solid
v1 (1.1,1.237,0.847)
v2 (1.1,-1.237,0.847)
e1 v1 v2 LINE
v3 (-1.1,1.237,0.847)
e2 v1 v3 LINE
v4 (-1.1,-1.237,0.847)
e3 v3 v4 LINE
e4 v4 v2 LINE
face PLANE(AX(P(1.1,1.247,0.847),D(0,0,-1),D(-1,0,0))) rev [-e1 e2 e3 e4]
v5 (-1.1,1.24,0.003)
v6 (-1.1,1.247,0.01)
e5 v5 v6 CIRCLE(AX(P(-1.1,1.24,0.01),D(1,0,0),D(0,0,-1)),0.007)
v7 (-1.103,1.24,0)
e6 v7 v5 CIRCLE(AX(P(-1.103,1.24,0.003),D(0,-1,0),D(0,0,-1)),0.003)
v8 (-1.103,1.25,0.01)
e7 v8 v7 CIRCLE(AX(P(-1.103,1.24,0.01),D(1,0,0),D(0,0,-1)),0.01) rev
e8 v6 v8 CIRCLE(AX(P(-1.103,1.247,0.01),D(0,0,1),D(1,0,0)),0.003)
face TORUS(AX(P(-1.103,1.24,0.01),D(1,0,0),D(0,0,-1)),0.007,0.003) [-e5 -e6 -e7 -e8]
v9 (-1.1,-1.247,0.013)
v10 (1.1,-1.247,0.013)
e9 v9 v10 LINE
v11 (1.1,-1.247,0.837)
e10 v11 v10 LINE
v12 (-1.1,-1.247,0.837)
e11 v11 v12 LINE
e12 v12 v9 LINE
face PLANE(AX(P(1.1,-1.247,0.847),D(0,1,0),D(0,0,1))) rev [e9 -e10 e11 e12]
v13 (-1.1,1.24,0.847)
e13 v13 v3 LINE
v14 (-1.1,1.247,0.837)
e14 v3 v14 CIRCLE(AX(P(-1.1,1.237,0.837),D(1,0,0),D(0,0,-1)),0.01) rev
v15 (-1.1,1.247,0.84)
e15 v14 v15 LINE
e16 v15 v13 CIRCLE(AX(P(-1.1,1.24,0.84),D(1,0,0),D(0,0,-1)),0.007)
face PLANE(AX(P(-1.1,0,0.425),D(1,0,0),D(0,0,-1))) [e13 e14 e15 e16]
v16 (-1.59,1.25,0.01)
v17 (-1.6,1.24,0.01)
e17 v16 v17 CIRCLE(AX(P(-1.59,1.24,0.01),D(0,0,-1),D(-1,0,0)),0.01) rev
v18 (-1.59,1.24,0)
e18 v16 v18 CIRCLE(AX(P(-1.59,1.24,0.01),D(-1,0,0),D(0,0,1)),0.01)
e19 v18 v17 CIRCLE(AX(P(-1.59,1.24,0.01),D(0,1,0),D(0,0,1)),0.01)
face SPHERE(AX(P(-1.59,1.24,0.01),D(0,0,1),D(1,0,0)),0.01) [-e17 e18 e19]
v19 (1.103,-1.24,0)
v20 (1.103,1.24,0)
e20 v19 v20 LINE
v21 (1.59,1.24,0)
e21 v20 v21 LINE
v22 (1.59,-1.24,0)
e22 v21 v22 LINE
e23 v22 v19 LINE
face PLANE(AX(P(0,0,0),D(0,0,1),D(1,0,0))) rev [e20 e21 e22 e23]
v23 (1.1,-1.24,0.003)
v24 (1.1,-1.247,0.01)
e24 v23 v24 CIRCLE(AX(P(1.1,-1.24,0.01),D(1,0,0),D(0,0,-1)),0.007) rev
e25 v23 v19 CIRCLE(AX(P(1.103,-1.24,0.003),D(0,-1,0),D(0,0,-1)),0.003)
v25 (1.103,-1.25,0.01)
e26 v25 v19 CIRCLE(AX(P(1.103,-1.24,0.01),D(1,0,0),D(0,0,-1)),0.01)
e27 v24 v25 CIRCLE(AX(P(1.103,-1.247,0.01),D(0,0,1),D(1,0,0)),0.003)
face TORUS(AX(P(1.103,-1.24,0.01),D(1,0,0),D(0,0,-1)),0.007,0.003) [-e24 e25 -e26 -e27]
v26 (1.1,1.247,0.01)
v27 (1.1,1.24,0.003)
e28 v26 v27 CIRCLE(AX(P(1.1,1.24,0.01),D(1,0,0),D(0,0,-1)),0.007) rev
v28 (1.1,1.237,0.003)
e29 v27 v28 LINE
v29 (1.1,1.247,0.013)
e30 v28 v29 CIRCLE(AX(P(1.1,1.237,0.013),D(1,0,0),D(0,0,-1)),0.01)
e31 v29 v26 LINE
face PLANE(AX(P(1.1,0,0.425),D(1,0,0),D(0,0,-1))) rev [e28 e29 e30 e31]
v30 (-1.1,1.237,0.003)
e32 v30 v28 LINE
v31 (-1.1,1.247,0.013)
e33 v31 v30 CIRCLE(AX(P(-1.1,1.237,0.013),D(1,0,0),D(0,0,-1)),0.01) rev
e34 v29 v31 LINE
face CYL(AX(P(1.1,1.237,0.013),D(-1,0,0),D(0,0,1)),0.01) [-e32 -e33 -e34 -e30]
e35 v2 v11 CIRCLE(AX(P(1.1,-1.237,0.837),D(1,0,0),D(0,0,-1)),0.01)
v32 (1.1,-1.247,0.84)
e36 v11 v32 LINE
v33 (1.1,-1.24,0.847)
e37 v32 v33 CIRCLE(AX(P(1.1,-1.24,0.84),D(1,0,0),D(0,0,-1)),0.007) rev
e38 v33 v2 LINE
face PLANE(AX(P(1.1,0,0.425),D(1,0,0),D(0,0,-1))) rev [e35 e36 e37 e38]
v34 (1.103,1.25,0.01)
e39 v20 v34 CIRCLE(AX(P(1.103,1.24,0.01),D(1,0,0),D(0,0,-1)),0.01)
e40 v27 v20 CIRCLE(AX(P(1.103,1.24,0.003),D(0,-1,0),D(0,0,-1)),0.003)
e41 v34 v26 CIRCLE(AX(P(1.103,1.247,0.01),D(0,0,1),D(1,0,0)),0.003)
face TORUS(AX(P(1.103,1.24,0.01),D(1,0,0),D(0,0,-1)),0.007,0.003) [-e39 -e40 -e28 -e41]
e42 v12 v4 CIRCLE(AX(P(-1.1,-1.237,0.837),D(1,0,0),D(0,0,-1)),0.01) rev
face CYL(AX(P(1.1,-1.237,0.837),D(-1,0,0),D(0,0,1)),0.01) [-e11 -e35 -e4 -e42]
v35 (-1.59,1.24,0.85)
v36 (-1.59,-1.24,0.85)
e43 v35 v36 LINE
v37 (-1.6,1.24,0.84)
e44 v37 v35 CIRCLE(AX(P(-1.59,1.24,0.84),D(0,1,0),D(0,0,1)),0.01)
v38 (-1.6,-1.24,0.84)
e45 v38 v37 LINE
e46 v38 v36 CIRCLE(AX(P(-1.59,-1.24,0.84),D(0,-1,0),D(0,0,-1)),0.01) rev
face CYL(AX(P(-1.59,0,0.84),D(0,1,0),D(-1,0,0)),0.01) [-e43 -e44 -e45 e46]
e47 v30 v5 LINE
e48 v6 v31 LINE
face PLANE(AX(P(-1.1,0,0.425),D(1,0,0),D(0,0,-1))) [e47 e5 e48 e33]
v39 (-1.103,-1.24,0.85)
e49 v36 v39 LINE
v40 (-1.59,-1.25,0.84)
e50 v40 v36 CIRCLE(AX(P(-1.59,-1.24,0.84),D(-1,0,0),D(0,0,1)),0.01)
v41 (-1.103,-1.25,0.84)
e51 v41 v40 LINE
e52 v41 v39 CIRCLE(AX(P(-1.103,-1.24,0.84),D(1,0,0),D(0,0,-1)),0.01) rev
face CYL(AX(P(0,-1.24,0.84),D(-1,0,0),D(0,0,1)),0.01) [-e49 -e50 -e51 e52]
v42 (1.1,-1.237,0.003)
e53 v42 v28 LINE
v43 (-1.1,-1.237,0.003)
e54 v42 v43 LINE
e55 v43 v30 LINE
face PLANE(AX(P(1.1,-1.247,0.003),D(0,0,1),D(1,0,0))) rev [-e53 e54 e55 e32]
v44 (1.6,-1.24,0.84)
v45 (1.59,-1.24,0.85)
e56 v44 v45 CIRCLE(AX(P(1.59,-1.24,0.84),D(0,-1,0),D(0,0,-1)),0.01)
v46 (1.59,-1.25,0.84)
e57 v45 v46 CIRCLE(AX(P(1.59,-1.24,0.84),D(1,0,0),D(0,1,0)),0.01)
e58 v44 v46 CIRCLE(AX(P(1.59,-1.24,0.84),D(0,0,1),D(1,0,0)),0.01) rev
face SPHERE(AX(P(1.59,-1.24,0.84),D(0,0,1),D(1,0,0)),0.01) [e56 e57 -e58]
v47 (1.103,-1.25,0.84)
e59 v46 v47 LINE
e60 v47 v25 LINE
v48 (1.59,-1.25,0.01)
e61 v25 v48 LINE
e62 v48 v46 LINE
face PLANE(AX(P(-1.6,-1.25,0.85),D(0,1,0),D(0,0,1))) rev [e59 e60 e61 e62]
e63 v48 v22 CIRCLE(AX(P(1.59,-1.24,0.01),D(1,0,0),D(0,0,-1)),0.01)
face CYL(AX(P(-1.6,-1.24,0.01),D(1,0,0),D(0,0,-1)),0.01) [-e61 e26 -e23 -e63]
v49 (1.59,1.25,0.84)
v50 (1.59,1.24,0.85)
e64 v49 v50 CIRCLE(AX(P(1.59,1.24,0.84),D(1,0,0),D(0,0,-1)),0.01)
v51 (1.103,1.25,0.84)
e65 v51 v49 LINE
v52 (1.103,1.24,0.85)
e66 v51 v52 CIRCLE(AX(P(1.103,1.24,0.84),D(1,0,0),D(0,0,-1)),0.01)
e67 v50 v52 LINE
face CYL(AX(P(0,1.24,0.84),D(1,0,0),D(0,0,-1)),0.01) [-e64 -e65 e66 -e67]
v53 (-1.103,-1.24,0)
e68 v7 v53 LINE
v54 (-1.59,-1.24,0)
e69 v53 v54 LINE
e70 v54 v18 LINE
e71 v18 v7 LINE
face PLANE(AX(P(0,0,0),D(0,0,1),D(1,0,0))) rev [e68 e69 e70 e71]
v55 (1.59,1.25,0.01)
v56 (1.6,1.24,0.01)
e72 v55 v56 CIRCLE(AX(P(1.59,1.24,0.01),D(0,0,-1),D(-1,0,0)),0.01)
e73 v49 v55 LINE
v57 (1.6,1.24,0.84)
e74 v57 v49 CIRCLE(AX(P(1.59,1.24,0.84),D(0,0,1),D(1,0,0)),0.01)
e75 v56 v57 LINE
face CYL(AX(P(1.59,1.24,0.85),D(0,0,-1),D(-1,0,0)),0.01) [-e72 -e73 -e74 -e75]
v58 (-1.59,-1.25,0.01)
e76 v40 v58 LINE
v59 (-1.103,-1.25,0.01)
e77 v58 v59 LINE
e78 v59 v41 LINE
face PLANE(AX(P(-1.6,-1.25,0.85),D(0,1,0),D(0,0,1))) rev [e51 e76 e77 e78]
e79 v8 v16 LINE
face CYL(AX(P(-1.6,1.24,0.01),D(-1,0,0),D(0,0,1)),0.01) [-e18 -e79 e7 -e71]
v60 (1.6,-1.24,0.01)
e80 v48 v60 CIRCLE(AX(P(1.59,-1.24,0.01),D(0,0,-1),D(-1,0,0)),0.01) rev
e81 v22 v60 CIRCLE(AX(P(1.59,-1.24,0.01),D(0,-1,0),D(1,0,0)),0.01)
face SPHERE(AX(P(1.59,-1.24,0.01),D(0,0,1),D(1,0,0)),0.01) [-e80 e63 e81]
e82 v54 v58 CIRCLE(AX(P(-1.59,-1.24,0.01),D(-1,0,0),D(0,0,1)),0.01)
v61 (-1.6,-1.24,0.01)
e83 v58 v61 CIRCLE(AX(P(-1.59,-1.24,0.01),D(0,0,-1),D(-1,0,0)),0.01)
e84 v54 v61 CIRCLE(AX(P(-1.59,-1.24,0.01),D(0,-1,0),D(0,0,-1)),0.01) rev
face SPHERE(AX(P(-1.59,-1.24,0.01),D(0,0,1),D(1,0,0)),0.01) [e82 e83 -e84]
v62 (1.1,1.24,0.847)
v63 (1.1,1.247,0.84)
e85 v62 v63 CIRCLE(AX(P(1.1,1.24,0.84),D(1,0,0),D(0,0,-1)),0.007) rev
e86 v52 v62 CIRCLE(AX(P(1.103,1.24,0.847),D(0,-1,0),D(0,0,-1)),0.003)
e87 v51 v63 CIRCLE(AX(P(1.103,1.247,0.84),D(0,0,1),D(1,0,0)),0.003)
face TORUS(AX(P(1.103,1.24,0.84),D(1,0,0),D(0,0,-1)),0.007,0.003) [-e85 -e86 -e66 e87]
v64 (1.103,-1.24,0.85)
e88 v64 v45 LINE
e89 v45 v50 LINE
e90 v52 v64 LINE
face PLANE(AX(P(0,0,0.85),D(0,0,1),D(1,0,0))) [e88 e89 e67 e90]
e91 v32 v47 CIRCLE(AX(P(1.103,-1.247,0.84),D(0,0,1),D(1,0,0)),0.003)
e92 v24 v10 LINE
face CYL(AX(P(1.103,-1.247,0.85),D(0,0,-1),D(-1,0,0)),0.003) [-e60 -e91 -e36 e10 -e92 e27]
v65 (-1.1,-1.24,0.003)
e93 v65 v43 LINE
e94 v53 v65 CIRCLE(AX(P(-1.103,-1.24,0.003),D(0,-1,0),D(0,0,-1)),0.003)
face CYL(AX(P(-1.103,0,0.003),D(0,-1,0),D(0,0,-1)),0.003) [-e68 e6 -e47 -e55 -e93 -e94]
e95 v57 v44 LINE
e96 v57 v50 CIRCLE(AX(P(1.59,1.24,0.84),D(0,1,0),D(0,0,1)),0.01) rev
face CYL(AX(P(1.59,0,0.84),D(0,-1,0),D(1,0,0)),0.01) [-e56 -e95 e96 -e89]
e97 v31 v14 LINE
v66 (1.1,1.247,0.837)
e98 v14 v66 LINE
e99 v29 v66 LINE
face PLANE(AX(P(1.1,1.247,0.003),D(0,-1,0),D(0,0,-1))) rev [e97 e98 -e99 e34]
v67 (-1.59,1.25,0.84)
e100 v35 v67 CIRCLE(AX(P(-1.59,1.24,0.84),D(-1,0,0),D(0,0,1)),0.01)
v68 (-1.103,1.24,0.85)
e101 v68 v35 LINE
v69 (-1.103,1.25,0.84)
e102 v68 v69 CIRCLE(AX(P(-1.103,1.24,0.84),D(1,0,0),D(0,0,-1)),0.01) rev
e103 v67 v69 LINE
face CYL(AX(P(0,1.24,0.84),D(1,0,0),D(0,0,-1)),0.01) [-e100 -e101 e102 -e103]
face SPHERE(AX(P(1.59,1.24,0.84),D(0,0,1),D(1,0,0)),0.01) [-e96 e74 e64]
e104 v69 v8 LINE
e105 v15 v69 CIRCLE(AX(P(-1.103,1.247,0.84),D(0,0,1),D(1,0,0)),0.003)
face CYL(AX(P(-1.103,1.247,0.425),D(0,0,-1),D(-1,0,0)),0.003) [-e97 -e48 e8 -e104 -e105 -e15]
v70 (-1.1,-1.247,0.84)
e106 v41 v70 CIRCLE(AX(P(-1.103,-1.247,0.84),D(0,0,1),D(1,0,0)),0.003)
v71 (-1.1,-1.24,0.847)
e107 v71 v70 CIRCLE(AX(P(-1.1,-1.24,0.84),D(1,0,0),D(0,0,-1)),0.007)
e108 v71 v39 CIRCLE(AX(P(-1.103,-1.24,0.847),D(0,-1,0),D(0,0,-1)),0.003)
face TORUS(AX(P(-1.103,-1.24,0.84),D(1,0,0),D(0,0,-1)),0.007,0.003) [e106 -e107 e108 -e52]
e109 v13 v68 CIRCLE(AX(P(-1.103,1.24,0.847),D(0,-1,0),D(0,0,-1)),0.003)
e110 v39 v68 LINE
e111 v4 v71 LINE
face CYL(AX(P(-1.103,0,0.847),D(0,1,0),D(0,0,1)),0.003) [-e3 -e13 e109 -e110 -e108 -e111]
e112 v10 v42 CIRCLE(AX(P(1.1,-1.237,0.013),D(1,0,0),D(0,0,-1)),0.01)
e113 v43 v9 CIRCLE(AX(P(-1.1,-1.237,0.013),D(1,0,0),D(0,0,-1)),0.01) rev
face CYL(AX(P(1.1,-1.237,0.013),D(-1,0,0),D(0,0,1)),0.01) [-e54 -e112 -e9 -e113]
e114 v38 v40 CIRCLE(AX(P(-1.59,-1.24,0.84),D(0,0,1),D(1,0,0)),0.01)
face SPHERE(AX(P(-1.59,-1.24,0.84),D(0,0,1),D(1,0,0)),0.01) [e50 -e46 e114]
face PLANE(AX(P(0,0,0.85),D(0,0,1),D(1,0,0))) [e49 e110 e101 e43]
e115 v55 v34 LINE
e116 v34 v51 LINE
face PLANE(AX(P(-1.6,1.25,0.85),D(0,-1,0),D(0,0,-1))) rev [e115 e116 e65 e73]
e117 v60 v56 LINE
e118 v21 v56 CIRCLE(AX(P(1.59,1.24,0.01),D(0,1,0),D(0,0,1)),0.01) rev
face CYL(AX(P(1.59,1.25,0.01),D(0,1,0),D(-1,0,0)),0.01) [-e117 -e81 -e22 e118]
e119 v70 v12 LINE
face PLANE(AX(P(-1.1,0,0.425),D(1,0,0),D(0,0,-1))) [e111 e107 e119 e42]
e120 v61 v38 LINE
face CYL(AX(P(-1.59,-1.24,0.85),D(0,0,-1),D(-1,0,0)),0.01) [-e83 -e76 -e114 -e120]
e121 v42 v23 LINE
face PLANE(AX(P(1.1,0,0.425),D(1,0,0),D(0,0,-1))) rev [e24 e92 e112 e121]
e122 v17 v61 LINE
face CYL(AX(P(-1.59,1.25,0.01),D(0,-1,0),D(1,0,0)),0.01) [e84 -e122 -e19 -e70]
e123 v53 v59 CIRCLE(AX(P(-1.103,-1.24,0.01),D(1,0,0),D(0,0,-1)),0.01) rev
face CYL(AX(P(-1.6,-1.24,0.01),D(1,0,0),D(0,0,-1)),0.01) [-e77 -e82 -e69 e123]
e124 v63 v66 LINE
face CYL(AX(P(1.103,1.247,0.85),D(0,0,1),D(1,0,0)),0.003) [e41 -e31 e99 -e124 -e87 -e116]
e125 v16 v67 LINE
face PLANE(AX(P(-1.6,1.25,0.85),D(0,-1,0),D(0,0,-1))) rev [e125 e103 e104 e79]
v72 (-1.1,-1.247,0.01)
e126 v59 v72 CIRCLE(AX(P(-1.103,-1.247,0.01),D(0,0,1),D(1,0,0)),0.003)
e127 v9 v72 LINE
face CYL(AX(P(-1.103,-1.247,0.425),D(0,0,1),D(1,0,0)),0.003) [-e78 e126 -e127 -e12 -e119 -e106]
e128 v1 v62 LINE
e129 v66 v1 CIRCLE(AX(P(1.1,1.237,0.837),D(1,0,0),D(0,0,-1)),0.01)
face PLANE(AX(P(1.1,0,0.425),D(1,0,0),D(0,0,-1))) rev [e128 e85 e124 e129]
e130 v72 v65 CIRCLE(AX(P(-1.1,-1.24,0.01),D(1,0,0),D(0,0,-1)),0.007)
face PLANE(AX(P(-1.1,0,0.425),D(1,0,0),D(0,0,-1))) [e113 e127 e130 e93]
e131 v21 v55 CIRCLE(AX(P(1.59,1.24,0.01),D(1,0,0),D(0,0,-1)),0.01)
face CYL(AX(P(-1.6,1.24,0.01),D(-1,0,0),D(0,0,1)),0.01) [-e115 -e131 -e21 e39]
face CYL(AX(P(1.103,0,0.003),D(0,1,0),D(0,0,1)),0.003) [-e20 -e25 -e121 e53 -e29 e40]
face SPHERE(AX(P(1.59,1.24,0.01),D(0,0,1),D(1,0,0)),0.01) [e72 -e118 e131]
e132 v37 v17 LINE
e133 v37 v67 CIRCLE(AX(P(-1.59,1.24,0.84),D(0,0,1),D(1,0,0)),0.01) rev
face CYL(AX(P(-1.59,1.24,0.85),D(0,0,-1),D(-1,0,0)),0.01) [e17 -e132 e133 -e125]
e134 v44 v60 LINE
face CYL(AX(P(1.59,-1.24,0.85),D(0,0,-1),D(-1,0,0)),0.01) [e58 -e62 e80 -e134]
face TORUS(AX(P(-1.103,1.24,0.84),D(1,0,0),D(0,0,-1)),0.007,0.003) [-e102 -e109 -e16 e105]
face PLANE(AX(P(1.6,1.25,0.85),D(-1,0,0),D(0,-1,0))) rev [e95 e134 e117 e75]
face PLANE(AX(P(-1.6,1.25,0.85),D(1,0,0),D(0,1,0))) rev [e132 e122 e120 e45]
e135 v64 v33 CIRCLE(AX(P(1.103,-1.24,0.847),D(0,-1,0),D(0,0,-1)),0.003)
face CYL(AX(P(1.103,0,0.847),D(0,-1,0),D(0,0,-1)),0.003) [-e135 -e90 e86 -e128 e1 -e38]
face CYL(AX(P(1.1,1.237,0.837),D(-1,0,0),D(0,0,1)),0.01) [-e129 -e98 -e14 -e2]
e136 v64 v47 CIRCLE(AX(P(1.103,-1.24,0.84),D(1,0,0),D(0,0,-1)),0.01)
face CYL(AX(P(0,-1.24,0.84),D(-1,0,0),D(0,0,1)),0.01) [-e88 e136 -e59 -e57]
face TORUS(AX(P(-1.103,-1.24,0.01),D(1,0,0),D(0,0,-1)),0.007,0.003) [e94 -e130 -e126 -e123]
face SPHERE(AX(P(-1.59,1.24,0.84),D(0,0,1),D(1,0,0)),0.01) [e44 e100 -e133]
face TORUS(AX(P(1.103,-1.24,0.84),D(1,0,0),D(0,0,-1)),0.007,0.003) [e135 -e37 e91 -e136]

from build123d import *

# Parameters (mm, degrees)
SKETCH1_W                           = 3.2
SKETCH1_H                           = 2.5
ALL_BODY_DEPTH                      = 0.85
CUT_OUT_THE_BODY_FOR_PIN_DEPTH      = 1.1
CUT_OUT_THE_BODY_FOR_PIN_DEPTH_BACK = 1.1
SKETCH2_OUTSIDE_W                   = 3.68
SKETCH2_OUTSIDE_H                   = 5.33
SKETCH2_OUTSIDE_W_2                 = 0.844
SKETCH2_OUTSIDE_H_2                 = 2.494
BODY_FILLET_R                       = 0.01
PIN_FILLET_A_R                      = 0.01
PIN_FILLET_B_R                      = 0.003


with BuildPart() as part:
    # Sketch1 → All body (new body)
    with BuildSketch(Plane.XY):
        Rectangle(SKETCH1_W, SKETCH1_H)
    extrude(amount=ALL_BODY_DEPTH)

    # Sketch2 outside → Cut out the body for pin (cut, two sides: drawn at the far end of the back side and taken through both)
    with BuildSketch(Plane(origin=(0, 0, 0), x_dir=(0, 0, -1), z_dir=(1, 0, 0)).offset(-CUT_OUT_THE_BODY_FOR_PIN_DEPTH_BACK)):
        with Locations((-0.425, 0)):
            Rectangle(SKETCH2_OUTSIDE_W, SKETCH2_OUTSIDE_H)
        with Locations((-0.425, 0)):
            Rectangle(SKETCH2_OUTSIDE_W_2, SKETCH2_OUTSIDE_H_2, mode=Mode.SUBTRACT)
    extrude(amount=CUT_OUT_THE_BODY_FOR_PIN_DEPTH + CUT_OUT_THE_BODY_FOR_PIN_DEPTH_BACK, mode=Mode.SUBTRACT)

    # Body fillet
    body_fillet_edges = [part.edges().sort_by_distance(p)[0] for p in [
        (0, 1.247, 0.003),
        (0, 1.247, 0.847),
        (0, -1.247, 0.847),
        (0, -1.247, 0.003),
    ]]
    fillet(body_fillet_edges, radius=BODY_FILLET_R)

    # Pin fillet a
    pin_fillet_a_edges = [part.edges().sort_by_distance(p)[0] for p in [
        (1.6, 0, 0.85),
        (-1.35, 1.25, 0),
        (1.35, -1.25, 0),
        (1.35, -1.25, 0.85),
        (-1.35, 1.25, 0.85),
        (1.35, 1.25, 0.85),
        (-1.6, 0, 0.85),
        (1.35, 1.25, 0),
        (1.6, 0, 0),
        (-1.35, -1.25, 0),
        (-1.6, 0, 0),
        (-1.6, 1.25, 0.425),
        (1.6, 1.25, 0.425),
        (1.6, -1.25, 0.425),
        (-1.6, -1.25, 0.425),
        (-1.35, -1.25, 0.85),
    ]]
    fillet(pin_fillet_a_edges, radius=PIN_FILLET_A_R)

    # Pin fillet b
    pin_fillet_b_edges = [part.edges().sort_by_distance(p)[0] for p in [
        (1.1, -1.25, 0.425),
        (1.1, 0, 0.85),
        (1.1, 1.25, 0.425),
        (1.1, 0, 0),
        (-1.1, 1.25, 0.425),
        (-1.1, 0, 0.85),
        (-1.1, -1.25, 0.425),
        (-1.1, 0, 0),
        (1.1, 1.247071068, 0.002928932),
        (1.1, -1.247071068, 0.002928932),
        (1.1, -1.247071068, 0.847071068),
        (1.1, 1.247071068, 0.847071068),
        (-1.1, -1.247071068, 0.847071068),
        (-1.1, 1.247071068, 0.847071068),
        (-1.1, -1.247071068, 0.002928932),
        (-1.1, 1.247071068, 0.002928932),
    ]]
    fillet(pin_fillet_b_edges, radius=PIN_FILLET_B_R - 0.0001)  # a hair under: the kernel refuses the full size


solid = part.part
